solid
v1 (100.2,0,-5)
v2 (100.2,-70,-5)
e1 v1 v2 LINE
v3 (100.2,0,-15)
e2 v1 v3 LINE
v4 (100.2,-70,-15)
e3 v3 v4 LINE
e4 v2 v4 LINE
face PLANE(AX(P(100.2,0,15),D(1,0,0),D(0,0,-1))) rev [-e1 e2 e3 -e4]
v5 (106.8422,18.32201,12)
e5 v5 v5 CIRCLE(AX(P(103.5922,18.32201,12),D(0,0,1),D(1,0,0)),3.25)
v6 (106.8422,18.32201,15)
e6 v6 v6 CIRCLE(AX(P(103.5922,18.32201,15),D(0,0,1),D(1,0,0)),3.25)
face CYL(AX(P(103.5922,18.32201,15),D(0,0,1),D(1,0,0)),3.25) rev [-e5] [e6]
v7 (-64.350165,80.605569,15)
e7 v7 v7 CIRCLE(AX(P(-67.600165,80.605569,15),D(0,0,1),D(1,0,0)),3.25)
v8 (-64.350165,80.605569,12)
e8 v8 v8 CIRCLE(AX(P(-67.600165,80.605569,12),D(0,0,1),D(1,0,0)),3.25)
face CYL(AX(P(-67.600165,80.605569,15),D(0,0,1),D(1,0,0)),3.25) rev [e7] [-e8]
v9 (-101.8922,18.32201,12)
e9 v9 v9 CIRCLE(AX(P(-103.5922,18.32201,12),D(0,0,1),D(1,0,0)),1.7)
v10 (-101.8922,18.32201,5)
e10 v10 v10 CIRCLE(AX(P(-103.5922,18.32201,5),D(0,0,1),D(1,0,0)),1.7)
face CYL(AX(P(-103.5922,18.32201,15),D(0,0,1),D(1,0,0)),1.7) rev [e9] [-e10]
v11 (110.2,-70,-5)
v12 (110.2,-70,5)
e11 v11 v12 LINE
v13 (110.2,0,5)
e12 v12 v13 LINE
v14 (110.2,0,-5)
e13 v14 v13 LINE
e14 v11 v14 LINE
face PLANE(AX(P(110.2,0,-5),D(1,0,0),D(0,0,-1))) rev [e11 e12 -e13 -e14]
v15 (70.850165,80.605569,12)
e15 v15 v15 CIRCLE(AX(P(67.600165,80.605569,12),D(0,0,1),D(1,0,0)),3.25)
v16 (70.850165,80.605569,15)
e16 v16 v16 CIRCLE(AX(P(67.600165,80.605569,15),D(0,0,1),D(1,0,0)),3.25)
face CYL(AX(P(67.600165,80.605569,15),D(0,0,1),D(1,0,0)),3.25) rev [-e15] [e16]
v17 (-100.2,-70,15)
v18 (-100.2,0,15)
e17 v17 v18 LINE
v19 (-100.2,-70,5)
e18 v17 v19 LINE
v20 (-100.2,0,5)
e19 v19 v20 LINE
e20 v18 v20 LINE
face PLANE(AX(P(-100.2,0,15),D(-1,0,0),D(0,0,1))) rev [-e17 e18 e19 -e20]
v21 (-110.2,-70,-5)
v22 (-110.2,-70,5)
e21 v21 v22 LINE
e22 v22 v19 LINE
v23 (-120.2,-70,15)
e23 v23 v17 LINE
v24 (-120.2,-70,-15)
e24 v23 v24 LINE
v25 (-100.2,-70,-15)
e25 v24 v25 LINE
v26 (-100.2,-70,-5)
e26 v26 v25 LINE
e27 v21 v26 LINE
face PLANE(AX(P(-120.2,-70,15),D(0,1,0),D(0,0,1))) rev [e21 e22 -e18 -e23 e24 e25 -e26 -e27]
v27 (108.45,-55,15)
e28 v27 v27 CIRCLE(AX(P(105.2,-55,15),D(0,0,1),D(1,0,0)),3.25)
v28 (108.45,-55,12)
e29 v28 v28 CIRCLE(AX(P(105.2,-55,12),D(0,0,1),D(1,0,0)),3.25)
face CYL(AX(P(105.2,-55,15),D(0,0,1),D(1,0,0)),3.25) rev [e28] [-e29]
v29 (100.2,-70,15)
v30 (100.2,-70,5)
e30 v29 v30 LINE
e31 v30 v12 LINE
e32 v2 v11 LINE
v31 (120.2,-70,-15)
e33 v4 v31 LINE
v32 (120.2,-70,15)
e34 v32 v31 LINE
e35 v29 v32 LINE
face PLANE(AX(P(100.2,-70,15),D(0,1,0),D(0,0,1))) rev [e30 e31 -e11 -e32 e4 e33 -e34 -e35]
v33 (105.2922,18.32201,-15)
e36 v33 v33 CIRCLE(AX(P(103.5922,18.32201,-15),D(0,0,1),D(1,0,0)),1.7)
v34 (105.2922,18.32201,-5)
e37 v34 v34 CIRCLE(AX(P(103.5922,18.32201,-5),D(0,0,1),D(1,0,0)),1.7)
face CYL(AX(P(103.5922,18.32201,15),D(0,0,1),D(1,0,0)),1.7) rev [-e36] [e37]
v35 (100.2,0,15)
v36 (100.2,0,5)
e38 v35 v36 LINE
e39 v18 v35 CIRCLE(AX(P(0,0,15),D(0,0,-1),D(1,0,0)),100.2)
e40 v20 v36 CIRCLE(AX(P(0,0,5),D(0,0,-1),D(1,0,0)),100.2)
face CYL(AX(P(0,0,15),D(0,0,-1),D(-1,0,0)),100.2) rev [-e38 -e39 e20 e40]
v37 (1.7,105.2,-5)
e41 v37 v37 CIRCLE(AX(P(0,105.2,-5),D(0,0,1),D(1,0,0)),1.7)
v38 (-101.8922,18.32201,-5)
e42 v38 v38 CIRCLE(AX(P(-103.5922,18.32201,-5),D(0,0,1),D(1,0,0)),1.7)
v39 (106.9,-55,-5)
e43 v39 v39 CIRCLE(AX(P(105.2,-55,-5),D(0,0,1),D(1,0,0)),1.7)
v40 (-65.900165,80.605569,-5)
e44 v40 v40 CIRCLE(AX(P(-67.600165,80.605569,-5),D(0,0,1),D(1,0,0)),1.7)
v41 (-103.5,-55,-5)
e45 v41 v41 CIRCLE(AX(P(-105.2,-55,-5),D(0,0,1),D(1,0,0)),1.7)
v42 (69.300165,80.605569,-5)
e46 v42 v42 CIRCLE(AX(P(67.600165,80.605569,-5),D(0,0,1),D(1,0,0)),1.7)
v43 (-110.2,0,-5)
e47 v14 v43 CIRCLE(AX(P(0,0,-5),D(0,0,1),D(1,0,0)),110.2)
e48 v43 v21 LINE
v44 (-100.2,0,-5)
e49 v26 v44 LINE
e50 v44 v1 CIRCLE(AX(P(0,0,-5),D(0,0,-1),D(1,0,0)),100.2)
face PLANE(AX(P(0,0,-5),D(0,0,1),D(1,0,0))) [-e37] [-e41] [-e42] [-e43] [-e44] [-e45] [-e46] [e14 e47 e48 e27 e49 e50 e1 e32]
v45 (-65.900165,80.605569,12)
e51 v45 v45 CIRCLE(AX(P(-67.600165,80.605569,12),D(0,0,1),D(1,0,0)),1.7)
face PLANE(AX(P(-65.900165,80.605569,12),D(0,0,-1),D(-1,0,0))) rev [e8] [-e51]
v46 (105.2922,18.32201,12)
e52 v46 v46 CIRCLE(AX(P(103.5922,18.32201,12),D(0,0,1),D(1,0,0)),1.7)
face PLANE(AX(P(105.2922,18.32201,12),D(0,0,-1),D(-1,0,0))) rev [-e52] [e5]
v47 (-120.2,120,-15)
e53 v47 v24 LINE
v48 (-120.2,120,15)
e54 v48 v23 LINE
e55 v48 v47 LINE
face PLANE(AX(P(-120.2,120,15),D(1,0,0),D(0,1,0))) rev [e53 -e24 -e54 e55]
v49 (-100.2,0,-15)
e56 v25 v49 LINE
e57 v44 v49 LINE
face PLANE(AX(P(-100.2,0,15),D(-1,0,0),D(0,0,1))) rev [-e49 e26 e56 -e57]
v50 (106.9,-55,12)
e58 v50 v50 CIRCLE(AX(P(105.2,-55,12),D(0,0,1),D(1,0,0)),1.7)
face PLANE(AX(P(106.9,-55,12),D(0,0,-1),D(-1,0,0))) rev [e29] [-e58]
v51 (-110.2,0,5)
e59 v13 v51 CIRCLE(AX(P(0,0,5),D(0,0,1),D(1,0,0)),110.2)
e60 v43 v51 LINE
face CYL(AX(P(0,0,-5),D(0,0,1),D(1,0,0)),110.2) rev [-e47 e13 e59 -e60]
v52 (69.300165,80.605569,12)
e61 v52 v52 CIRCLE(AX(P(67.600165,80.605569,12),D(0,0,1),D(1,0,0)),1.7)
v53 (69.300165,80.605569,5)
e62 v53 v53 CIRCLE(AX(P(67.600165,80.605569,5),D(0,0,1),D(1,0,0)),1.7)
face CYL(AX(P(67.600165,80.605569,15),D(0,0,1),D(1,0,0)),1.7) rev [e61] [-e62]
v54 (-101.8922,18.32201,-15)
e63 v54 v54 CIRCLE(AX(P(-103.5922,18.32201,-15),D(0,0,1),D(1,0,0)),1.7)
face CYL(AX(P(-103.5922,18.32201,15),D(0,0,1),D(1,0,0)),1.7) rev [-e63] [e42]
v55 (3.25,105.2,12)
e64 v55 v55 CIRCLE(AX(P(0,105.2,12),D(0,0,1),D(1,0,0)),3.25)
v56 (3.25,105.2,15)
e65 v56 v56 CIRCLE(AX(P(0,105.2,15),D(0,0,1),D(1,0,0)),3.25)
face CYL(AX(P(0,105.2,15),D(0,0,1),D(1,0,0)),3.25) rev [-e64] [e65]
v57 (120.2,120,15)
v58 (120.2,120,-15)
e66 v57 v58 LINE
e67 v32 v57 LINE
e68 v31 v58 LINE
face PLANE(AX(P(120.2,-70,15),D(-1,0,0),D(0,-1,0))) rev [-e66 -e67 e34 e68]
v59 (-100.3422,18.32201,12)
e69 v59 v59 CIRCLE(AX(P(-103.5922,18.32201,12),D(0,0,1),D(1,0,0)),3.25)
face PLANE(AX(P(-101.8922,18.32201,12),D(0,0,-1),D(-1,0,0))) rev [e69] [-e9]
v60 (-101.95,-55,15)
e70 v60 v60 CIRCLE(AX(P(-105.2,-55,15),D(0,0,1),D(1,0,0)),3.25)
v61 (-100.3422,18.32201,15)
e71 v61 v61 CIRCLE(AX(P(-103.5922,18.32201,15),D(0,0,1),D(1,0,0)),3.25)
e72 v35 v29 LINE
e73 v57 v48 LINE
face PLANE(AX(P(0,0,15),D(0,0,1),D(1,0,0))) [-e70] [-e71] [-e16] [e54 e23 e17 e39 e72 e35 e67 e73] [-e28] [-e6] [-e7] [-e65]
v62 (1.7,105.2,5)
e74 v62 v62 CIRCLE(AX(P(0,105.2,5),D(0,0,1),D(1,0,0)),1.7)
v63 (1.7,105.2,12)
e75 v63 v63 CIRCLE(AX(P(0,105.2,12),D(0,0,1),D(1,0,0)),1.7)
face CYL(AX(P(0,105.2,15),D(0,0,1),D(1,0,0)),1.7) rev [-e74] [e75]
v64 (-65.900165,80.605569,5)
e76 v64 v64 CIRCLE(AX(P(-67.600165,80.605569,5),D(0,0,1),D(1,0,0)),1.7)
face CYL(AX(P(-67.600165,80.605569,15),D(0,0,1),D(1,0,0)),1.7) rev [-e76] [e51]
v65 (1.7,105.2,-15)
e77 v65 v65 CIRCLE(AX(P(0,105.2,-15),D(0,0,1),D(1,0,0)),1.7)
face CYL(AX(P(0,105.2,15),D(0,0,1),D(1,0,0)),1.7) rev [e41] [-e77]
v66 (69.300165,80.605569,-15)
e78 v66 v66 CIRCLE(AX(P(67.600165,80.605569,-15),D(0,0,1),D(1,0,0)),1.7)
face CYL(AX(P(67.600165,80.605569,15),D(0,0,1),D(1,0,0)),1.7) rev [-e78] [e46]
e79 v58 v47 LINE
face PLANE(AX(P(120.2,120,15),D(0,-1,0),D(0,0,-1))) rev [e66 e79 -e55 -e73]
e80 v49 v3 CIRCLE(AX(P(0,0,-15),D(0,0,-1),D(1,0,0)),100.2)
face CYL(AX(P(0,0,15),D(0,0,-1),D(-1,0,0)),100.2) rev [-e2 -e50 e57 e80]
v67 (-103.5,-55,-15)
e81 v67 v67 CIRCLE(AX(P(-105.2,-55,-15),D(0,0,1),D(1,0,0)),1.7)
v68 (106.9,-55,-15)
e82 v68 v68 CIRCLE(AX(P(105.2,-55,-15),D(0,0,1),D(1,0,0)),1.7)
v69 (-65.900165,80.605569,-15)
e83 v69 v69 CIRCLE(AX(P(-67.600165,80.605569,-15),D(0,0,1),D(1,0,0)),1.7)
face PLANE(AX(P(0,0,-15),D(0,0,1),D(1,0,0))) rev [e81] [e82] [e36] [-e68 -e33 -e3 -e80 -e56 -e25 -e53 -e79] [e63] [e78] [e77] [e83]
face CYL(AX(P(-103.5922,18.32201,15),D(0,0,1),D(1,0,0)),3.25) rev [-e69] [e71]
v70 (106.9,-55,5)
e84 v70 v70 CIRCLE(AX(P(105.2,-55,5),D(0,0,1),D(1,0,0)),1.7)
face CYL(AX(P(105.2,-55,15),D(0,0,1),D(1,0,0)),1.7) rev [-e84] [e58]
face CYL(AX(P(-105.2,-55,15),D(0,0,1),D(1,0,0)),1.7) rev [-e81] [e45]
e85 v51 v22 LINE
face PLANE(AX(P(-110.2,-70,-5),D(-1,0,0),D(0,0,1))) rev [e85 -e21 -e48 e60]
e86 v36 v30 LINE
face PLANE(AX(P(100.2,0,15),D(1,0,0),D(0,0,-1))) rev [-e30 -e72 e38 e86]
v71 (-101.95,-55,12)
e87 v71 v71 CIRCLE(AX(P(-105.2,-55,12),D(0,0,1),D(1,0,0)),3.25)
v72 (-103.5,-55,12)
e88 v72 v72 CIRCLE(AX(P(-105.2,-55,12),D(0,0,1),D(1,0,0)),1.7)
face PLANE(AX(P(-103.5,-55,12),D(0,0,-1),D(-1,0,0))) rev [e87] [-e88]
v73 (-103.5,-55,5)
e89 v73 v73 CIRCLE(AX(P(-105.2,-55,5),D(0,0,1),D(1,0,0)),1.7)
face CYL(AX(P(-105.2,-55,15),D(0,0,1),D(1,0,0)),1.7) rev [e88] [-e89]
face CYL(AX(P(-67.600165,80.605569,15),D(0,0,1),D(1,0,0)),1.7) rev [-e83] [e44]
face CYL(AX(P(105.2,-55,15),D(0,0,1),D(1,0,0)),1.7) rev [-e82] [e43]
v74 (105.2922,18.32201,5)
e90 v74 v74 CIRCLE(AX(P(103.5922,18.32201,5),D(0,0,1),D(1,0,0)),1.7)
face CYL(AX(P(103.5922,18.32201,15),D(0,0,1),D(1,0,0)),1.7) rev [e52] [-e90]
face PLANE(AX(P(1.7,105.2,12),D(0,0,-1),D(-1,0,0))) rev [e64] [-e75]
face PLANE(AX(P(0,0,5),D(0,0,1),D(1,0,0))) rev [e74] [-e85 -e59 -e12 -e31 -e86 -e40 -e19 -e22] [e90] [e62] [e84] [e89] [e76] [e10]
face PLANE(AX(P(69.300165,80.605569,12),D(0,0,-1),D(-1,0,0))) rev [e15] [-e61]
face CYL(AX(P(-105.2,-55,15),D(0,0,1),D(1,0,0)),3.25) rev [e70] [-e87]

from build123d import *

# Parameters (mm, degrees)
BOSS_EXTRUDE1_DEPTH            = 15
CUT_EXTRUDE1_DEPTH             = 5
CBORE_FOR_M3_SHCS1_D           = 3.4
CBORE_FOR_M3_SHCS1_CBORE_D     = 6.5
CBORE_FOR_M3_SHCS1_CBORE_DEPTH = 3
CRVPATTERN1_START              = -15
CRVPATTERN1_OUTLINE_R          = 1.7
CRVPATTERN1_DEPTH              = 30
CRVPATTERN1_START_2            = 12
CRVPATTERN1_2_OUTLINE_R        = 3.25
CRVPATTERN1_2_OUTLINE_R_2      = 1.7
CRVPATTERN1_2_DEPTH            = 3


# Read off the part's stored shape, not the designer's step: CrvPattern1
with BuildPart() as part:
    # Sketch1 → Boss-Extrude1 (new, symmetric)
    with BuildSketch(Plane.XY):
        with BuildLine():
            Line((-100.2, 0), (-100.2, -70))
            Line((-100.2, -70), (-120.2, -70))
            Line((-120.2, -70), (-120.2, 120))
            Line((-120.2, 120), (120.2, 120))
            Line((120.2, 120), (120.2, -70))
            Line((120.2, -70), (100.2, -70))
            Line((100.2, -70), (100.2, 0))
            ThreePointArc((100.2, 0), (0, 100.2), (-100.2, 0))
        make_face()
    extrude(amount=BOSS_EXTRUDE1_DEPTH, both=True)

    # Sketch2 → Cut-Extrude1 (cut, symmetric)
    with BuildSketch(Plane.XY):
        with BuildLine():
            Line((-110.2, -70), (-110.2, 0))
            ThreePointArc((-110.2, 0), (0, 110.2), (110.2, 0))
            Line((110.2, 0), (110.2, -70))
            Line((110.2, -70), (100.2, -70))
            Line((100.2, -70), (100.2, 0))
            ThreePointArc((100.2, 0), (0, 100.2), (-100.2, 0))
            Line((-100.2, 0), (-100.2, -70))
            Line((-100.2, -70), (-110.2, -70))
        make_face()
    extrude(amount=CUT_EXTRUDE1_DEPTH, both=True, mode=Mode.SUBTRACT)

    # CBORE for M3 SHCS1 (through all)
    with Locations(Plane.XY.offset(15)):
        with Locations((-105.2, -55)):
            CounterBoreHole(CBORE_FOR_M3_SHCS1_D / 2, CBORE_FOR_M3_SHCS1_CBORE_D / 2, CBORE_FOR_M3_SHCS1_CBORE_DEPTH)

    # CrvPattern1 outline → CrvPattern1 (cut)
    with BuildSketch(Plane.XY.offset(CRVPATTERN1_START)):
        with Locations((-103.59220022, 18.322010084)):
            Circle(CRVPATTERN1_OUTLINE_R)
        with Locations((-67.600164716, 80.605568855)):
            Circle(CRVPATTERN1_OUTLINE_R)
        with Locations((0, 105.2)):
            Circle(CRVPATTERN1_OUTLINE_R)
        with Locations((67.600164716, 80.605568855)):
            Circle(CRVPATTERN1_OUTLINE_R)
        with Locations((103.59220022, 18.322010084)):
            Circle(CRVPATTERN1_OUTLINE_R)
        with Locations((105.2, -55)):
            Circle(CRVPATTERN1_OUTLINE_R)
    extrude(amount=CRVPATTERN1_DEPTH, mode=Mode.SUBTRACT)

    # CrvPattern1 2 outline → CrvPattern1 2 (cut)
    # profile 1 of 6: a face of its own
    with BuildSketch(Plane.XY.offset(CRVPATTERN1_START_2)):
        with Locations((-103.59220022, 18.322010084)):
            Circle(CRVPATTERN1_2_OUTLINE_R)
        with Locations((-103.59220022, 18.322010084)):
            Circle(CRVPATTERN1_2_OUTLINE_R_2, mode=Mode.SUBTRACT)
    # profile 2 of 6: a face of its own
    with BuildSketch(Plane.XY.offset(CRVPATTERN1_START_2)):
        with Locations((-67.600164716, 80.605568855)):
            Circle(CRVPATTERN1_2_OUTLINE_R)
        with Locations((-67.600164716, 80.605568855)):
            Circle(CRVPATTERN1_2_OUTLINE_R_2, mode=Mode.SUBTRACT)
    # profile 3 of 6: a face of its own
    with BuildSketch(Plane.XY.offset(CRVPATTERN1_START_2)):
        with Locations((0, 105.2)):
            Circle(CRVPATTERN1_2_OUTLINE_R)
        with Locations((0, 105.2)):
            Circle(CRVPATTERN1_2_OUTLINE_R_2, mode=Mode.SUBTRACT)
    # profile 4 of 6: a face of its own
    with BuildSketch(Plane.XY.offset(CRVPATTERN1_START_2)):
        with Locations((67.600164716, 80.605568855)):
            Circle(CRVPATTERN1_2_OUTLINE_R)
        with Locations((67.600164716, 80.605568855)):
            Circle(CRVPATTERN1_2_OUTLINE_R_2, mode=Mode.SUBTRACT)
    # profile 5 of 6: a face of its own
    with BuildSketch(Plane.XY.offset(CRVPATTERN1_START_2)):
        with Locations((103.59220022, 18.322010084)):
            Circle(CRVPATTERN1_2_OUTLINE_R)
        with Locations((103.59220022, 18.322010084)):
            Circle(CRVPATTERN1_2_OUTLINE_R_2, mode=Mode.SUBTRACT)
    # profile 6 of 6: a face of its own
    with BuildSketch(Plane.XY.offset(CRVPATTERN1_START_2)):
        with Locations((105.2, -55)):
            Circle(CRVPATTERN1_2_OUTLINE_R)
        with Locations((105.2, -55)):
            Circle(CRVPATTERN1_2_OUTLINE_R_2, mode=Mode.SUBTRACT)
    extrude(amount=CRVPATTERN1_2_DEPTH, mode=Mode.SUBTRACT)


solid = part.part
